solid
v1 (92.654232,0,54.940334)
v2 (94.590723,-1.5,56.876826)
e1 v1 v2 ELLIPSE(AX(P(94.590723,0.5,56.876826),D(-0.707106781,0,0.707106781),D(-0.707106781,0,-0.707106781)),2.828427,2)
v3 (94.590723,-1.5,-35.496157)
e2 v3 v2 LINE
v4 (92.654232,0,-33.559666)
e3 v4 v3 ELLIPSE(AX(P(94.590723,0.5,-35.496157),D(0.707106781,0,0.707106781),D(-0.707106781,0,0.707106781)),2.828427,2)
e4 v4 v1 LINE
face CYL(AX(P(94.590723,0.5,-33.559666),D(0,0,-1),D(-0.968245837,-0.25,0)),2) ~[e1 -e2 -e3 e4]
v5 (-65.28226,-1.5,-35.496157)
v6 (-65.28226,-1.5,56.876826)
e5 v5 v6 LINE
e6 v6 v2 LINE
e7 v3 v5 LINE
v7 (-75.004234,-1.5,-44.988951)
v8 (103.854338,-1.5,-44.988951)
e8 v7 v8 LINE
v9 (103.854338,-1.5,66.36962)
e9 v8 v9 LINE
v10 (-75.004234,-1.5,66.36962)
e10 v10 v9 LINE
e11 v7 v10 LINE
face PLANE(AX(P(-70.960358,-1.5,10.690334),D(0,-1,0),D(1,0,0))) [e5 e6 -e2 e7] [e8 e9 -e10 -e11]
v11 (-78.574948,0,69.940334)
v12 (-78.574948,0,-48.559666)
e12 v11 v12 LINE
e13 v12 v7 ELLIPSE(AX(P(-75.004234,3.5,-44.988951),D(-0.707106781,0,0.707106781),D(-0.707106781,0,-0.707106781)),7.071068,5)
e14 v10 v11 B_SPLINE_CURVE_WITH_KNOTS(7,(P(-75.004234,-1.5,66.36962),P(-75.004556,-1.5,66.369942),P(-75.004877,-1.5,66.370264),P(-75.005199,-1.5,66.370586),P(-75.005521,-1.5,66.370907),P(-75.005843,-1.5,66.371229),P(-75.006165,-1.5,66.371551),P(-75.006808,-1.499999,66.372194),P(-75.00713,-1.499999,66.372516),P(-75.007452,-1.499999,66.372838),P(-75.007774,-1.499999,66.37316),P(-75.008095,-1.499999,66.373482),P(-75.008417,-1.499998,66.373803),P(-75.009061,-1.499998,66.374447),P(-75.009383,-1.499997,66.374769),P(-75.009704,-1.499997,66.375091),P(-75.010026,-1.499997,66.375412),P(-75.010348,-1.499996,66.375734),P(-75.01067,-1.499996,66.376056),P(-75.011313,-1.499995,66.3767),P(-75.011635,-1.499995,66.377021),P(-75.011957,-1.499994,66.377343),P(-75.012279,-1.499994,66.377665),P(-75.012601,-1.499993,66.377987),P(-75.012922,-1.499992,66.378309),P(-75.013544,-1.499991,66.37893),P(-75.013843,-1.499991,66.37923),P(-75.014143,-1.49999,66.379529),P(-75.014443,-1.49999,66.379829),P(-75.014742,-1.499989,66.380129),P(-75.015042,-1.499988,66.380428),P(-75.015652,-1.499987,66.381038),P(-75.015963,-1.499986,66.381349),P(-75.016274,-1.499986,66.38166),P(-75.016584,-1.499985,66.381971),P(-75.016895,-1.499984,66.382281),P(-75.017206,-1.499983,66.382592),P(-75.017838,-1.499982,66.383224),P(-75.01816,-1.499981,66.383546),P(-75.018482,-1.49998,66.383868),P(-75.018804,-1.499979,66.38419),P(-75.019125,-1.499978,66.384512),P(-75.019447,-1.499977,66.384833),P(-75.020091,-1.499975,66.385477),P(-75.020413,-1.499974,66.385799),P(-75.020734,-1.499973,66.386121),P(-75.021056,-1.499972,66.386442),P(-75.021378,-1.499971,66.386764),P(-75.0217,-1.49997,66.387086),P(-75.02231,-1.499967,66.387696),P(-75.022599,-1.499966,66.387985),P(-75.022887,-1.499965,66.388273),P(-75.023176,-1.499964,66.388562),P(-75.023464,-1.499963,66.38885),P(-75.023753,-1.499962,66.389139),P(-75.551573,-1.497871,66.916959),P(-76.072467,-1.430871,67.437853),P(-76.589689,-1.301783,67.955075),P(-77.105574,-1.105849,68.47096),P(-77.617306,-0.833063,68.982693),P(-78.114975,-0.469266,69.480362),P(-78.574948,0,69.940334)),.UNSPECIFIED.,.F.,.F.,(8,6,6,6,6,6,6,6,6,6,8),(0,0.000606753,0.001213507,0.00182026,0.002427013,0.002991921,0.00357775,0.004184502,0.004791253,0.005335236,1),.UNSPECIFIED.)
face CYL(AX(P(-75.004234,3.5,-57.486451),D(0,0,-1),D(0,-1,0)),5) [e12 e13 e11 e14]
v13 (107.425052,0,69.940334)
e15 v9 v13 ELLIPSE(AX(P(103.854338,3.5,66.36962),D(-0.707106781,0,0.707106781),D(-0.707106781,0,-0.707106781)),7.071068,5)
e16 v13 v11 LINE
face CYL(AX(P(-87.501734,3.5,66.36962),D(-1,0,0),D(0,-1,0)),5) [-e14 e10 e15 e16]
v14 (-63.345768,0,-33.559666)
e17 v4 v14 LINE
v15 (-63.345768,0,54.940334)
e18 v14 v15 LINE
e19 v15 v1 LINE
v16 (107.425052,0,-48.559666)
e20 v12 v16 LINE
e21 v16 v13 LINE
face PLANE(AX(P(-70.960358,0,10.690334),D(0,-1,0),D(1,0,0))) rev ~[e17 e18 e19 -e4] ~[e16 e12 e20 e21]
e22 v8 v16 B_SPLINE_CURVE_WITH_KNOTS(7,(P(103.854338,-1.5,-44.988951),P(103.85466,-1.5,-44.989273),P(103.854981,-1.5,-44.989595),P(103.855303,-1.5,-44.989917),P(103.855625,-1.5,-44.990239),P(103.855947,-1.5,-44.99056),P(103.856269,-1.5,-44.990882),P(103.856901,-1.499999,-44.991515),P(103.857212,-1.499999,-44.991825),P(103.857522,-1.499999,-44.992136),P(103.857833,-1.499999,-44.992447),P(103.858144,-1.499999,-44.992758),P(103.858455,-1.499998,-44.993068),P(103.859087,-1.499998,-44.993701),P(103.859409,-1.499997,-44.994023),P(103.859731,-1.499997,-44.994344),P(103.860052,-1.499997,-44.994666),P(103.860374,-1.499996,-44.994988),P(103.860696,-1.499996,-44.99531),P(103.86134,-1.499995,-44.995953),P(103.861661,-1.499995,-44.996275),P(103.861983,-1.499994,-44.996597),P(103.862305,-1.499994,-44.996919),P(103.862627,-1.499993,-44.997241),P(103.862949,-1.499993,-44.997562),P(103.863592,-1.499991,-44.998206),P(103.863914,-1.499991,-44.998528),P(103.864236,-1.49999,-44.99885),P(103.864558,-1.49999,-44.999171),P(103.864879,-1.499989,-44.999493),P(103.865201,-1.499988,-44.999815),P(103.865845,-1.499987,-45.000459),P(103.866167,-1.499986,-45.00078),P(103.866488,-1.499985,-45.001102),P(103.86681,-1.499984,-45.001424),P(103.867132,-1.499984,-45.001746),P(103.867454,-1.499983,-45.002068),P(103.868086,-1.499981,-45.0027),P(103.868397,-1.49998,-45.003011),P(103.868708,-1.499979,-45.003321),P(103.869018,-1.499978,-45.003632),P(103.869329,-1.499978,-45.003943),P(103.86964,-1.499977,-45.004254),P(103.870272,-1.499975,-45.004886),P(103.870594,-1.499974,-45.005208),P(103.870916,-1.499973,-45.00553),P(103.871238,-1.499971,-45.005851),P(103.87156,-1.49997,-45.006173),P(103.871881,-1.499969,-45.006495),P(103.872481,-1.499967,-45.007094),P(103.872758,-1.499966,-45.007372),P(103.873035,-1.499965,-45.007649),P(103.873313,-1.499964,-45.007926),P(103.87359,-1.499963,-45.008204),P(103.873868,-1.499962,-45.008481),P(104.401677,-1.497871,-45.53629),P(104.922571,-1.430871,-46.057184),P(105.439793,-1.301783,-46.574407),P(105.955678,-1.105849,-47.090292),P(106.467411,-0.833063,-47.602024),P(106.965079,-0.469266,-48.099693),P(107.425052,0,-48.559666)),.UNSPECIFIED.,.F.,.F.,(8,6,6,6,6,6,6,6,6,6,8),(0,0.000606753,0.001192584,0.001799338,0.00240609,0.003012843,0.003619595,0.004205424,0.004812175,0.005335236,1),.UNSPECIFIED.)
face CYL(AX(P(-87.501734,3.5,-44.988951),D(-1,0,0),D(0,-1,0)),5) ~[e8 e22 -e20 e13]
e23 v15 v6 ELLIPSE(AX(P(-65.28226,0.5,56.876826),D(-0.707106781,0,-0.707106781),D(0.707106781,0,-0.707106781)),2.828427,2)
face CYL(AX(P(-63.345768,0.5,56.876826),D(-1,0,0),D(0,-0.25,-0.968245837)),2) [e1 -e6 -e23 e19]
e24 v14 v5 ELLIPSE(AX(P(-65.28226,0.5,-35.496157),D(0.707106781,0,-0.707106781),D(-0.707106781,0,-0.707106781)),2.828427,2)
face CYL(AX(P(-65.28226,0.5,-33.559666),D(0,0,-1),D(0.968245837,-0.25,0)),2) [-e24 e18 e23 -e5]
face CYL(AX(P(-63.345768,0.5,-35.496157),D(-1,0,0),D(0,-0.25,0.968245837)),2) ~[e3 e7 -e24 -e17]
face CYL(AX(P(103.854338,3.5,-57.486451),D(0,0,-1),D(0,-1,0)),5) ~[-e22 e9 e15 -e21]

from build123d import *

# Parameters (mm, degrees)
F0_W         = 15.2291797996
F0_H         = 88.5
F0_W_2       = 14.7708202004
F1_DEPTH     = 1.5
F2_T1_DEPTH  = 88.5
F2_T3_DEPTH  = 156
F2_T9_DEPTH  = 93.3412291828
F2_T13_DEPTH = 160.8412291828
F2_T20_DEPTH = 93.3412291828
F2_T24_DEPTH = 160.8412291828
F2_T31_DEPTH = 160.8412291828
F2_T35_DEPTH = 93.3412291828
F2_T42_DEPTH = 93.3412291828
F2_T46_DEPTH = 160.8412291828
F3_T1_DEPTH  = 203.8535710714
F3_T3_DEPTH  = 136.3535710714


# Not quite as in the source:
# - a fillet or chamfer that OpenCascade refuses, or shapes differently, is made with other operations: its cross-section is extruded or revolved along the edge and cut away or added


with BuildPart() as f1:
    # F0 (on Front) → F1 (new body)
    with BuildSketch(Plane.XZ):
        with Locations((-70.9603581131, 10.6903343201)):
            Rectangle(F0_W, F0_H)
        with Locations((100.0396418869, 10.6903343201)):
            Rectangle(F0_W_2, F0_H)
        Polygon((-78.5749480128, 54.9403343201), (-63.3457682133, 54.9403343201), (92.4250519872, 54.9403343201), (92.6542317867, 54.9403343201), (107.4250519872, 54.9403343201), (107.4250519872, 69.9403343201), (107.4249148369, 69.9403343201), (92.6542317867, 69.9403343201), (-63.3457682133, 69.9403343201), (-78.5749480128, 69.9403343201), (-78.5749480128, 64.060893178), align=None)
        Polygon((92.6542317867, -33.5596656799), (-63.3457682133, -33.5596656799), (-78.5749480128, -33.5596656799), (-78.5749480128, -40.4141508043), (-78.5749480128, -48.5596656799), (-63.5749480128, -48.5596656799), (-63.3457682133, -48.5596656799), (92.6542317867, -48.5596656799), (107.4250519872, -48.5596656799), (107.4250519872, -33.5596656799), align=None)
    extrude(amount=F1_DEPTH)

    # F2: fillet of radius 2 on 4 edges, made by hand

    # F2_s2 → F2_t1 (cut)
    with BuildSketch(Plane.XY.offset(-33.5596656799)):
        with BuildLine():
            ThreePointArc((-63.3457682133, 0), (-64.057515015, -1.0811388301), (-65.2822598864, -1.5))
            Line((-65.2822598864, -1.5), (-63.3457682133, -1.5))
            Line((-63.3457682133, -1.5), (-63.3457682133, 0))
        make_face()
        with BuildLine():
            ThreePointArc((92.6542317867, 0), (93.3659785884, -1.0811388301), (94.5907234598, -1.5))
            Line((94.5907234598, -1.5), (92.6542317867, -1.5))
            Line((92.6542317867, -1.5), (92.6542317867, 0))
        make_face()
    extrude(amount=F2_T1_DEPTH, mode=Mode.SUBTRACT)

    # F2_s4 → F2_t3 (cut)
    with BuildSketch(Plane.YZ.offset(-63.3457682133)):
        with BuildLine():
            ThreePointArc((0, 54.9403343201), (-1.0811388301, 55.6520811218), (-1.5, 56.8768259932))
            Line((-1.5, 56.8768259932), (-1.5, 54.9403343201))
            Line((-1.5, 54.9403343201), (0, 54.9403343201))
        make_face()
        with BuildLine():
            ThreePointArc((0, -33.5596656799), (-1.0811388301, -34.2714124816), (-1.5, -35.496157353))
            Line((-1.5, -35.496157353), (-1.5, -33.5596656799))
            Line((-1.5, -33.5596656799), (0, -33.5596656799))
        make_face()
    extrude(amount=F2_T3_DEPTH, mode=Mode.SUBTRACT)


with BuildPart() as f2_tool7:
    # F2_s8 → F2_t9 (new body)
    with BuildSketch(Plane.XY.offset(-38.4008948627)):
        with BuildLine():
            ThreePointArc((-63.3457682133, 0), (-64.057515015, -1.0811388301), (-65.2822598864, -1.5))
            Line((-65.2822598864, -1.5), (-63.3457682133, -1.5))
            Line((-63.3457682133, -1.5), (-63.3457682133, 0))
        make_face()
    extrude(amount=F2_T9_DEPTH)

    split(bisect_by=Plane.XY.offset(-33.5596656799), keep=Keep.BOTTOM)


with BuildPart() as f2_tool11:
    # F2_s12 → F2_t13 (new body)
    with BuildSketch(Plane.YZ.offset(92.6542317867)):
        with BuildLine():
            ThreePointArc((0, -33.5596656799), (-1.0811388301, -34.2714124816), (-1.5, -35.496157353))
            Line((-1.5, -35.496157353), (-1.5, -33.5596656799))
            Line((-1.5, -33.5596656799), (0, -33.5596656799))
        make_face()
    extrude(amount=-F2_T13_DEPTH)

    split(bisect_by=Plane.YZ.offset(-63.3457682133), keep=Keep.BOTTOM)


with BuildPart() as f2_tool7_1:
    add(f2_tool7.part)

    # F2_t15: intersect F2_tool11
    add(f2_tool11.part, mode=Mode.INTERSECT)


with BuildPart() as f1_1:
    add(f1.part)

    # F2_t5: cut F2_tool7
    add(f2_tool7_1.part, mode=Mode.SUBTRACT)


with BuildPart() as f2_tool18:
    # F2_s19 → F2_t20 (new body)
    with BuildSketch(Plane.XY.offset(-33.5596656799)):
        with BuildLine():
            ThreePointArc((-63.3457682133, 0), (-64.057515015, -1.0811388301), (-65.2822598864, -1.5))
            Line((-65.2822598864, -1.5), (-63.3457682133, -1.5))
            Line((-63.3457682133, -1.5), (-63.3457682133, 0))
        make_face()
    extrude(amount=F2_T20_DEPTH)

    split(bisect_by=Plane.XY.offset(54.9403343201), keep=Keep.TOP)


with BuildPart() as f2_tool22:
    # F2_s23 → F2_t24 (new body)
    with BuildSketch(Plane.YZ.offset(-68.186997396)):
        with BuildLine():
            ThreePointArc((0, 54.9403343201), (-1.0811388301, 55.6520811218), (-1.5, 56.8768259932))
            Line((-1.5, 56.8768259932), (-1.5, 54.9403343201))
            Line((-1.5, 54.9403343201), (0, 54.9403343201))
        make_face()
    extrude(amount=F2_T24_DEPTH)

    split(bisect_by=Plane.YZ.offset(-63.3457682133), keep=Keep.BOTTOM)


with BuildPart() as f2_tool18_1:
    add(f2_tool18.part)

    # F2_t26: intersect F2_tool22
    add(f2_tool22.part, mode=Mode.INTERSECT)


with BuildPart() as f1_2:
    add(f1_1.part)

    # F2_t16: cut F2_tool18
    add(f2_tool18_1.part, mode=Mode.SUBTRACT)


with BuildPart() as f2_tool29:
    # F2_s30 → F2_t31 (new body)
    with BuildSketch(Plane.YZ.offset(-63.3457682133)):
        with BuildLine():
            ThreePointArc((0, 54.9403343201), (-1.0811388301, 55.6520811218), (-1.5, 56.8768259932))
            Line((-1.5, 56.8768259932), (-1.5, 54.9403343201))
            Line((-1.5, 54.9403343201), (0, 54.9403343201))
        make_face()
    extrude(amount=F2_T31_DEPTH)

    split(bisect_by=Plane.YZ.offset(92.6542317867), keep=Keep.TOP)


with BuildPart() as f2_tool33:
    # F2_s34 → F2_t35 (new body)
    with BuildSketch(Plane.XY.offset(59.7815635028)):
        with BuildLine():
            ThreePointArc((92.6542317867, 0), (93.3659785884, -1.0811388301), (94.5907234598, -1.5))
            Line((94.5907234598, -1.5), (92.6542317867, -1.5))
            Line((92.6542317867, -1.5), (92.6542317867, 0))
        make_face()
    extrude(amount=-F2_T35_DEPTH)

    split(bisect_by=Plane.XY.offset(54.9403343201), keep=Keep.TOP)


with BuildPart() as f2_tool29_1:
    add(f2_tool29.part)

    # F2_t37: intersect F2_tool33
    add(f2_tool33.part, mode=Mode.INTERSECT)


with BuildPart() as f1_3:
    add(f1_2.part)

    # F2_t27: cut F2_tool29
    add(f2_tool29_1.part, mode=Mode.SUBTRACT)


with BuildPart() as f2_tool40:
    # F2_s41 → F2_t42 (new body)
    with BuildSketch(Plane.XY.offset(54.9403343201)):
        with BuildLine():
            ThreePointArc((92.6542317867, 0), (93.3659785884, -1.0811388301), (94.5907234598, -1.5))
            Line((94.5907234598, -1.5), (92.6542317867, -1.5))
            Line((92.6542317867, -1.5), (92.6542317867, 0))
        make_face()
    extrude(amount=-F2_T42_DEPTH)

    split(bisect_by=Plane.XY.offset(-33.5596656799), keep=Keep.BOTTOM)


with BuildPart() as f2_tool44:
    # F2_s45 → F2_t46 (new body)
    with BuildSketch(Plane.YZ.offset(97.4954609695)):
        with BuildLine():
            ThreePointArc((0, -33.5596656799), (-1.0811388301, -34.2714124816), (-1.5, -35.496157353))
            Line((-1.5, -35.496157353), (-1.5, -33.5596656799))
            Line((-1.5, -33.5596656799), (0, -33.5596656799))
        make_face()
    extrude(amount=-F2_T46_DEPTH)

    split(bisect_by=Plane.YZ.offset(92.6542317867), keep=Keep.TOP)


with BuildPart() as f2_tool40_1:
    add(f2_tool40.part)

    # F2_t48: intersect F2_tool44
    add(f2_tool44.part, mode=Mode.INTERSECT)


with BuildPart() as f1_4:
    add(f1_3.part)

    # F2_t38: cut F2_tool40
    add(f2_tool40_1.part, mode=Mode.SUBTRACT)

    # F3: fillet of radius 5 on 4 edges, made by hand

    # F3_s2 → F3_t1 (cut)
    with BuildSketch(Plane.YZ.offset(-87.5017335485)):
        with BuildLine():
            ThreePointArc((-1.5, 66.3696201058), (-1.1097722286, 68.3061117789), (0, 69.9403343201))
            Line((0, 69.9403343201), (-1.5, 69.9403343201))
            Line((-1.5, 69.9403343201), (-1.5, 66.3696201058))
        make_face()
        with BuildLine():
            ThreePointArc((-1.5, -44.9889514657), (-1.1097722286, -46.9254431388), (0, -48.5596656799))
            Line((0, -48.5596656799), (-1.5, -48.5596656799))
            Line((-1.5, -48.5596656799), (-1.5, -44.9889514657))
        make_face()
    extrude(amount=F3_T1_DEPTH, mode=Mode.SUBTRACT)

    # F3_s4 → F3_t3 (cut)
    with BuildSketch(Plane.XY.offset(-57.4864512156)):
        with BuildLine():
            ThreePointArc((103.8543377729, -1.5), (105.790829446, -1.1097722286), (107.4250519872, 0))
            Line((107.4250519872, 0), (107.4250519872, -1.5))
            Line((107.4250519872, -1.5), (103.8543377729, -1.5))
        make_face()
        with BuildLine():
            ThreePointArc((-75.0042337986, -1.5), (-76.9407254717, -1.1097722286), (-78.5749480128, 0))
            Line((-78.5749480128, 0), (-78.5749480128, -1.5))
            Line((-78.5749480128, -1.5), (-75.0042337986, -1.5))
        make_face()
    extrude(amount=F3_T3_DEPTH, mode=Mode.SUBTRACT)


solid = f1_4.part
